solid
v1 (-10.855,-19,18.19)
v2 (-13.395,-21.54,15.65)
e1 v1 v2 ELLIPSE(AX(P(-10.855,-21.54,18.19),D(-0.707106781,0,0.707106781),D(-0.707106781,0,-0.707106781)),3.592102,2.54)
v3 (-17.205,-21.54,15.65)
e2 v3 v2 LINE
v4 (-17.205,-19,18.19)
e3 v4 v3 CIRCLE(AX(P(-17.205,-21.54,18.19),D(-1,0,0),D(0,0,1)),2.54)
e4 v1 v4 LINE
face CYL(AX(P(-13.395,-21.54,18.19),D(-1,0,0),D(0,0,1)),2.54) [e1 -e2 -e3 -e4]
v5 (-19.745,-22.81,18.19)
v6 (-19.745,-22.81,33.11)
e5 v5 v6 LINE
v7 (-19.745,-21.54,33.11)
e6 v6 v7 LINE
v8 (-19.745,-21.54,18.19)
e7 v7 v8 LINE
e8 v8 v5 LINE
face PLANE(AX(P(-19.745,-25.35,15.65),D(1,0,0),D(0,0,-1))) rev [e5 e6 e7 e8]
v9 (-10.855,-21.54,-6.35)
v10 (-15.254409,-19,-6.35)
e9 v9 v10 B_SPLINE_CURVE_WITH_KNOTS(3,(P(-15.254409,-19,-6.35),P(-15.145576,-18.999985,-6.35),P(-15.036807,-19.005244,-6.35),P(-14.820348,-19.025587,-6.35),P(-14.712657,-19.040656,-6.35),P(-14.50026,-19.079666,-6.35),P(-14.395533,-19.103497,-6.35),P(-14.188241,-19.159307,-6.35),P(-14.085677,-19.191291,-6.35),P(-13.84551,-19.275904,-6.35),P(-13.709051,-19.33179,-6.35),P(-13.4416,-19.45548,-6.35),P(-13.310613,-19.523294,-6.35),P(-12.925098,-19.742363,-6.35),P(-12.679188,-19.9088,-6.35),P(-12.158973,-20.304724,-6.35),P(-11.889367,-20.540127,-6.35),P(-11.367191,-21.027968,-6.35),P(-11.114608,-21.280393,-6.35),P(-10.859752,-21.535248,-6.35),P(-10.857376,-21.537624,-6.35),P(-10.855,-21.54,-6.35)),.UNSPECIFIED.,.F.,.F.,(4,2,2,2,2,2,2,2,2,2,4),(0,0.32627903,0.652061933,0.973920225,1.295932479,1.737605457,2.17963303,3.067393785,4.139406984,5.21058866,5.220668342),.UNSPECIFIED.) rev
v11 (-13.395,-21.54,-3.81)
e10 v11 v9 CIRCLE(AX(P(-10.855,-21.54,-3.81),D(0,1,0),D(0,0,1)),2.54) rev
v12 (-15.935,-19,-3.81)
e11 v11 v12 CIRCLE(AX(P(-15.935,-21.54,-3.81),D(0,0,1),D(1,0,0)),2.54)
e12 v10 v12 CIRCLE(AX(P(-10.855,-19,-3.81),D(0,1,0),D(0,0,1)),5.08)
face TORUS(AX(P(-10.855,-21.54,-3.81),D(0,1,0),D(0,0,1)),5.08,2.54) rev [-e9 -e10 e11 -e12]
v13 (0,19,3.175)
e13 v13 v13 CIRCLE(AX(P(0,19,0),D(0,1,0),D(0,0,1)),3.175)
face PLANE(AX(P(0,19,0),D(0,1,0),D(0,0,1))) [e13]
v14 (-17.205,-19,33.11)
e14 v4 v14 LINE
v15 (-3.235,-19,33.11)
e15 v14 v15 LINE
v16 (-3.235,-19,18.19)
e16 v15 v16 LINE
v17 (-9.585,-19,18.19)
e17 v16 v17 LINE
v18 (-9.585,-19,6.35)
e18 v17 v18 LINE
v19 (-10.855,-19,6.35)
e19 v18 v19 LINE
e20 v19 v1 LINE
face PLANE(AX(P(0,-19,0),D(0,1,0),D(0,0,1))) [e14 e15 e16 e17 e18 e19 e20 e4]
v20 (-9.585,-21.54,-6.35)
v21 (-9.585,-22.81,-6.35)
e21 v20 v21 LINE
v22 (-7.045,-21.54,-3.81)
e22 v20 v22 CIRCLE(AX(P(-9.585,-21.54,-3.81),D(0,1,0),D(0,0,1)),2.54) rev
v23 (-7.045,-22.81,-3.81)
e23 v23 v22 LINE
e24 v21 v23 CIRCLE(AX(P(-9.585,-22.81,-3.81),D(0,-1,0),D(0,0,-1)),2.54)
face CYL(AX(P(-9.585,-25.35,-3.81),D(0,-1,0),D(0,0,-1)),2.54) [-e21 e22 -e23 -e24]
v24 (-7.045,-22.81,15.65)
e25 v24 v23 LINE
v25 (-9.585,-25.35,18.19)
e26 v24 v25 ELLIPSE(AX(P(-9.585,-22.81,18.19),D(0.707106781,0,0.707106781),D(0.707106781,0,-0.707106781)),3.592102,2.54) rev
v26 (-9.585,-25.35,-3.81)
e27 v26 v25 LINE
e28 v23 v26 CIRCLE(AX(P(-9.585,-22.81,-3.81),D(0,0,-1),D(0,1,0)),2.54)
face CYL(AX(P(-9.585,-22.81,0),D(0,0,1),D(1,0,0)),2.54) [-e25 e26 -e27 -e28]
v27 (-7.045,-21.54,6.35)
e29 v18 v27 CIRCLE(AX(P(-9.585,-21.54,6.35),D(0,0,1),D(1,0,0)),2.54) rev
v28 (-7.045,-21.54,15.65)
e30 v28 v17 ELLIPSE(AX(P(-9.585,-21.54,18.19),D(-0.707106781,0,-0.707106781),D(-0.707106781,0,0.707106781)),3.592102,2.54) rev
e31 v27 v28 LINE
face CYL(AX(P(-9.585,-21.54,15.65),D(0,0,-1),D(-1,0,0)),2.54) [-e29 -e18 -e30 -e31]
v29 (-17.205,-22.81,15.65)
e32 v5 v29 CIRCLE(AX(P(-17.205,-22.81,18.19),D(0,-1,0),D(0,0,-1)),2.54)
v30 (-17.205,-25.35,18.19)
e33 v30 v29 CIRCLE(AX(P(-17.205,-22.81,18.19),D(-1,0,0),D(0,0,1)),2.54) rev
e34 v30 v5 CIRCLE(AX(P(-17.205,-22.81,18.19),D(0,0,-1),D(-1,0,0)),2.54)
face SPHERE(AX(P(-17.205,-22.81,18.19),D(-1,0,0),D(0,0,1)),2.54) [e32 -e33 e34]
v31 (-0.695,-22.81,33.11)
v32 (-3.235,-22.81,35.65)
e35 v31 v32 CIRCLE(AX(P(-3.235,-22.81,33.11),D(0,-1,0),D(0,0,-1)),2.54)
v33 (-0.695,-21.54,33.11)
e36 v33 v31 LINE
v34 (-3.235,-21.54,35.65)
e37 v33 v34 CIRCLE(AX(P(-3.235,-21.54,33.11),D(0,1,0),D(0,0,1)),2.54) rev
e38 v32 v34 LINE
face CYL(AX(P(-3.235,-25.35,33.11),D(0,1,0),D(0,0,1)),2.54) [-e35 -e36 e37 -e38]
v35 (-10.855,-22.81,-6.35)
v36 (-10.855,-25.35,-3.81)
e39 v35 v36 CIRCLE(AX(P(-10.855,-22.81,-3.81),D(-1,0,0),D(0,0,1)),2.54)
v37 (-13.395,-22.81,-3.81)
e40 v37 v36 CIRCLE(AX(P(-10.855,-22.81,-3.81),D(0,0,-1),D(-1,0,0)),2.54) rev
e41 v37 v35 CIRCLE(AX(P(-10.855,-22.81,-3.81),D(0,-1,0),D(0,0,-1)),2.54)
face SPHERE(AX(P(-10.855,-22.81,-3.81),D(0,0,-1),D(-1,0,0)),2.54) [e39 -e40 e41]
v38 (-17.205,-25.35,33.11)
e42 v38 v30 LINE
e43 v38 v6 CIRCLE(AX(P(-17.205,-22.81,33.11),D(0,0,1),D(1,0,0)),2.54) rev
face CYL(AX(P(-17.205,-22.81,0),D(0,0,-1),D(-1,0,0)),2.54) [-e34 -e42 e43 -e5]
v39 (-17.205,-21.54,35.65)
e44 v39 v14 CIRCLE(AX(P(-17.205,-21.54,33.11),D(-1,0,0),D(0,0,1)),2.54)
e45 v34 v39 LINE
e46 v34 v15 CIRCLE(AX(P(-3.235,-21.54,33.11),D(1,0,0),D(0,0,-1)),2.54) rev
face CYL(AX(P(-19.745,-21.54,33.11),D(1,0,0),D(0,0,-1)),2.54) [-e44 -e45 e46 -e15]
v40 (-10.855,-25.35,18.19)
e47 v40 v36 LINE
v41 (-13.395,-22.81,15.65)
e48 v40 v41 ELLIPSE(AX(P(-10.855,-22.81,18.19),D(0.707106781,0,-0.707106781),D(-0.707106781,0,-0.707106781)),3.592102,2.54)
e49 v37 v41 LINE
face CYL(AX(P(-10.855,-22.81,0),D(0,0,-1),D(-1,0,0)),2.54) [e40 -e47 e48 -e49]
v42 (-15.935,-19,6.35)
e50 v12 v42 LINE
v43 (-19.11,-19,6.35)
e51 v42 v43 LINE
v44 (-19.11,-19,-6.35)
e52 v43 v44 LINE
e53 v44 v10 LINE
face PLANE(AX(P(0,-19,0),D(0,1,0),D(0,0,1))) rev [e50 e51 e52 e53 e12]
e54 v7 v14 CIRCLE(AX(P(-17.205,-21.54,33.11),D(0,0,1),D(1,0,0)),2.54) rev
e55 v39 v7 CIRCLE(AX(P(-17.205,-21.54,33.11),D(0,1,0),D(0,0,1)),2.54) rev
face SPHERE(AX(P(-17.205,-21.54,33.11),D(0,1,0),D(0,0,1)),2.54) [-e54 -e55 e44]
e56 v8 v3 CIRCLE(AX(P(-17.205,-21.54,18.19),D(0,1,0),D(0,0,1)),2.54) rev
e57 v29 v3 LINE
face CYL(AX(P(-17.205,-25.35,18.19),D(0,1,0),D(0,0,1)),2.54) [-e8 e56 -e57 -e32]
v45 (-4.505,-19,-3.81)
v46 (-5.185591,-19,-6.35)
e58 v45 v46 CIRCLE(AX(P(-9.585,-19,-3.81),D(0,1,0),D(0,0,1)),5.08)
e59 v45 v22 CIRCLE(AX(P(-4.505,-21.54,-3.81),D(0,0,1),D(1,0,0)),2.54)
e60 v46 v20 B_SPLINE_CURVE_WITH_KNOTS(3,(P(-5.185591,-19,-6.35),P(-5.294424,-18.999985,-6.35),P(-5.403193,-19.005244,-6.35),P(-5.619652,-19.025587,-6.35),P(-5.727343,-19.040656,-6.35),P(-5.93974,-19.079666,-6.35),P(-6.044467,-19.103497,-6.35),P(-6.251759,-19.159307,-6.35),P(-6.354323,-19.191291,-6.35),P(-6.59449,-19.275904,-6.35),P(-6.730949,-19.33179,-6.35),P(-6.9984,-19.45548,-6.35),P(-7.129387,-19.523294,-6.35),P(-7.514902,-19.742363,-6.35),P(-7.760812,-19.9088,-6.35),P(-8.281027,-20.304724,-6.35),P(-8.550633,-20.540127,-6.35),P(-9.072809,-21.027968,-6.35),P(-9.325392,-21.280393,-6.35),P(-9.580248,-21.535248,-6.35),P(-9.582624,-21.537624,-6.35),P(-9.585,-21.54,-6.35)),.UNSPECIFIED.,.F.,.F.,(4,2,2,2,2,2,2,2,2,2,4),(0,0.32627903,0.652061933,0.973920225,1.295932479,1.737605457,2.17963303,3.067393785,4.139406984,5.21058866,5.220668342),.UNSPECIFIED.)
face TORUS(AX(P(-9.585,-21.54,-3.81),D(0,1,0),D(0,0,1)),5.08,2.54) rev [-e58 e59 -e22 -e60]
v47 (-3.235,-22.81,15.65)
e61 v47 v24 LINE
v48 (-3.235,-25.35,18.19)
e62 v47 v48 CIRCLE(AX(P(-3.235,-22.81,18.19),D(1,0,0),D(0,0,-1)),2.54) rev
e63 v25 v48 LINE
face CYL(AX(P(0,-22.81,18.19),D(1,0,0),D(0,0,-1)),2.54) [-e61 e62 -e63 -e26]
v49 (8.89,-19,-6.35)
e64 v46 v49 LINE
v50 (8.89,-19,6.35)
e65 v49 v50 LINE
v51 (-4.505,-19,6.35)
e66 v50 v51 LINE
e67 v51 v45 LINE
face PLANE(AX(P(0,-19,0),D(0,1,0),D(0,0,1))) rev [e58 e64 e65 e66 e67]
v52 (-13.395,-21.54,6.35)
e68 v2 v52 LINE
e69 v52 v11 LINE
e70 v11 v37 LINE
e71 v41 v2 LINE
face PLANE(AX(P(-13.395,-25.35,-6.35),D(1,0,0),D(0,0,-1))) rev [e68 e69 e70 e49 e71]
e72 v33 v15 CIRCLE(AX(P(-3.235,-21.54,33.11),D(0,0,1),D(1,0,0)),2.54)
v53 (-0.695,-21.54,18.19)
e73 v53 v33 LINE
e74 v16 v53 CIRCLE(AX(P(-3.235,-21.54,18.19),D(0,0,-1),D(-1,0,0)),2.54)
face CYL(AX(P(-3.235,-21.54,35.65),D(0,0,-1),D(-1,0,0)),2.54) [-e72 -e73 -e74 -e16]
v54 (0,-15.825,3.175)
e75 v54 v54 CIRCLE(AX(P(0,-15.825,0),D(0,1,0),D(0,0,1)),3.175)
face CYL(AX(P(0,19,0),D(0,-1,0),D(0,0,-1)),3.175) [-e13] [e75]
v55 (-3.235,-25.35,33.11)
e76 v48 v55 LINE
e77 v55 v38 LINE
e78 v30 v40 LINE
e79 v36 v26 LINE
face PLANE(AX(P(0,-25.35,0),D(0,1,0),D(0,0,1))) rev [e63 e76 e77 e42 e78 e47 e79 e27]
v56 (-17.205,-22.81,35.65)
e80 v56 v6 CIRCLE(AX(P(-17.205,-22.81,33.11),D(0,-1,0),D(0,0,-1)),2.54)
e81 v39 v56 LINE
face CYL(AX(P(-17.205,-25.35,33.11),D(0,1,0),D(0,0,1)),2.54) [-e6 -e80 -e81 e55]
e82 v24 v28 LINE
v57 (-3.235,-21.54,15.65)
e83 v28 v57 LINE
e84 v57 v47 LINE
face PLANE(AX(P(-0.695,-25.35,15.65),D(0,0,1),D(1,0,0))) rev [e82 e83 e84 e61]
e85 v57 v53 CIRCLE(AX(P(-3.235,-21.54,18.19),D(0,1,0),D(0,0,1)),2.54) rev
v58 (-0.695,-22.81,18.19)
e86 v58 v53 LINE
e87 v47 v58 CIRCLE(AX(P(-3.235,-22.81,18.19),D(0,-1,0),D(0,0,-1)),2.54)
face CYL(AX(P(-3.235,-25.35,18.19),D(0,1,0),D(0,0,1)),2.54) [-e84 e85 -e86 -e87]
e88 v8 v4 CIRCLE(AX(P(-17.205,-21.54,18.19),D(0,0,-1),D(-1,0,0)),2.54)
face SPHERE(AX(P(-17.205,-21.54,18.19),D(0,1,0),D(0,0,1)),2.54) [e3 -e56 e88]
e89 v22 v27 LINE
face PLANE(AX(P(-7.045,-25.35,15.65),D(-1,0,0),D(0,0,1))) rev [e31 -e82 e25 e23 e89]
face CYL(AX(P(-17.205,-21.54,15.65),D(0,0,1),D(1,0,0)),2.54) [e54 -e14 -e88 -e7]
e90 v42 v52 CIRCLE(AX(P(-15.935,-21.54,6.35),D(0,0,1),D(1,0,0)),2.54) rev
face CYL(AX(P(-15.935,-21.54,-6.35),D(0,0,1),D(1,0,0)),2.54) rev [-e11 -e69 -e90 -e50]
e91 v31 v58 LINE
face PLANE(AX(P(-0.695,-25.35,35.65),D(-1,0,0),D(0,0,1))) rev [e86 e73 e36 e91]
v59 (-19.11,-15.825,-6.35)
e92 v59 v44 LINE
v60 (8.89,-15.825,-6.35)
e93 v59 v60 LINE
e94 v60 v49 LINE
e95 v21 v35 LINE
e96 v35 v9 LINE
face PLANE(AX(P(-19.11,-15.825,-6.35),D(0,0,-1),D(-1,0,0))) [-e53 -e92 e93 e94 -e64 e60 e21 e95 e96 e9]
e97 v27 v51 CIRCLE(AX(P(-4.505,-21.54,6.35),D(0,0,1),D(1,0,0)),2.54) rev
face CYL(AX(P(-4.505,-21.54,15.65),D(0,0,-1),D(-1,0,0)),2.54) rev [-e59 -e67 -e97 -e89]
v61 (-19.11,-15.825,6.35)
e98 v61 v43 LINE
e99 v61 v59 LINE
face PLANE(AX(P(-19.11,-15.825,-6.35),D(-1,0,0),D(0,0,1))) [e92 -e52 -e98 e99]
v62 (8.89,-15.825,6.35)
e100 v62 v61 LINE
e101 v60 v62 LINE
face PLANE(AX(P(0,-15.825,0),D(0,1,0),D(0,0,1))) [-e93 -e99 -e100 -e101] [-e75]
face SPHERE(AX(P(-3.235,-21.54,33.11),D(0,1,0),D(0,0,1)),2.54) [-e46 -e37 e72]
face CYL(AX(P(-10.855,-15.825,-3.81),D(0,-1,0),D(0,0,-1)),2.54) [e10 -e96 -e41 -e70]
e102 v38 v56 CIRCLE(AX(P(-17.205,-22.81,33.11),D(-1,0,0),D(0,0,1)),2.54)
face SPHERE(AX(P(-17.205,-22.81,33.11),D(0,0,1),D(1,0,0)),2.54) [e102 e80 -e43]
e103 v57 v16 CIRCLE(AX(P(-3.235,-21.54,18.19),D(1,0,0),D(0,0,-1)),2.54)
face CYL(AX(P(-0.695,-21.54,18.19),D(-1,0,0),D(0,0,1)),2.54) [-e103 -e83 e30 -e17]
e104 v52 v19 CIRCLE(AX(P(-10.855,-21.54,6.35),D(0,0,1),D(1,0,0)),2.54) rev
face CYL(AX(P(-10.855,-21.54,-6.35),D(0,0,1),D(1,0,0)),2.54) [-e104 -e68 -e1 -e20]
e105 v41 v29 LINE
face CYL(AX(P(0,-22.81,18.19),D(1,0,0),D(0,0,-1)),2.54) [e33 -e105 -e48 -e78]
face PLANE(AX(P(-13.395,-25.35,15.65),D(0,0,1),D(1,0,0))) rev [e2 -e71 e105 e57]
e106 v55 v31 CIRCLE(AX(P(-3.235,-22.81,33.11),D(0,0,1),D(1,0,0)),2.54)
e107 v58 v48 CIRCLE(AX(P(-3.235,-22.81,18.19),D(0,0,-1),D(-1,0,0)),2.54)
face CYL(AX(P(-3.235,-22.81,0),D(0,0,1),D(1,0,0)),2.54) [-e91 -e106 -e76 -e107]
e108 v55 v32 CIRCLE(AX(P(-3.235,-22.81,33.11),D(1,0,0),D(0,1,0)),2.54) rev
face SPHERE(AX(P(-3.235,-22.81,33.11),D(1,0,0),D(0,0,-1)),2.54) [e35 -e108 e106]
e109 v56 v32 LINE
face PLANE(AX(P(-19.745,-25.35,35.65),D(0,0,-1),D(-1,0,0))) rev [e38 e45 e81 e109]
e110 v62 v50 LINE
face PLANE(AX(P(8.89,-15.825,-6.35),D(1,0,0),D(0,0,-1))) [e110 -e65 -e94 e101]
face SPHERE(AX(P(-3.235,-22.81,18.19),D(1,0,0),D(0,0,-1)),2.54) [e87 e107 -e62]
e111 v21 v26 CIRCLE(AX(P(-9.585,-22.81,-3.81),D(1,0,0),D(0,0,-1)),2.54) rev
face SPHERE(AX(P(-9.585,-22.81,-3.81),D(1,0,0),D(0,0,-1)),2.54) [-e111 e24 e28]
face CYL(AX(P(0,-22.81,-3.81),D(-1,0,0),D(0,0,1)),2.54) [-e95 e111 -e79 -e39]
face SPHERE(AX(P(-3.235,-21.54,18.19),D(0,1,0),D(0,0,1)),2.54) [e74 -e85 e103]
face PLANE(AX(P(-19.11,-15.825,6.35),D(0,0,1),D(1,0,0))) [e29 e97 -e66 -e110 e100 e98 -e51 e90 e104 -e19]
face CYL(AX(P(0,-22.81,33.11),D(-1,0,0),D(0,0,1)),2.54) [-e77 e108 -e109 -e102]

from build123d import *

# Parameters (mm, degrees)
SKETCH1_R           = 3.175
BOSS_EXTRUDE1_DEPTH = 19
SKETCH2_W           = 28
SKETCH2_H           = 12.7
BOSS_EXTRUDE2_DEPTH = 3.175
BOSS_EXTRUDE3_DEPTH = 6.35
FILLET1_R           = 2.54
FILLET2_R           = 2.54


with BuildPart() as part:
    # Sketch1 → Boss-Extrude1 (new, symmetric)
    with BuildSketch(Plane(origin=(0, 0, 0), x_dir=(1, 0, 0), z_dir=(0, 1, 0))):
        with Locations(Location((0, 0, 0), (0, 0, 270))):
            Circle(SKETCH1_R)
    extrude(amount=BOSS_EXTRUDE1_DEPTH, both=True)

    # Sketch2 → Boss-Extrude2 (add)
    with BuildSketch(Plane.XZ.offset(19)):
        with Locations((-5.11, 0)):
            Rectangle(SKETCH2_W, SKETCH2_H)
    extrude(amount=-BOSS_EXTRUDE2_DEPTH)

    # Sketch3 → Boss-Extrude3 (add)
    with BuildSketch(Plane.XZ.offset(19)):
        Polygon((-13.395, -6.35), (-13.395, 15.65), (-19.745, 15.65), (-19.745, 35.65), (-0.695, 35.65), (-0.695, 15.65), (-7.045, 15.65), (-7.045, -6.35), align=None)
    extrude(amount=BOSS_EXTRUDE3_DEPTH)

    # Fillet1
    fillet1_edges = [part.edges().sort_by_distance(p)[0] for p in [
        (-13.395, -25.35, 4.65),
        (-16.57, -25.35, 15.65),
        (-3.87, -25.35, 15.65),
        (-7.045, -25.35, 4.65),
        (-10.22, -25.35, -6.35),
        (-0.695, -22.175, 15.65),
        (-0.695, -25.35, 25.65),
        (-0.695, -19, 25.65),
        (-0.695, -22.175, 35.65),
        (-10.22, -25.35, 35.65),
        (-10.22, -19, 35.65),
        (-19.745, -22.175, 35.65),
        (-19.745, -25.35, 25.65),
        (-19.745, -22.175, 15.65),
        (-19.745, -19, 25.65),
        (-3.87, -19, 15.65),
        (-16.57, -19, 15.65),
        (-7.045, -19, 11),
        (-13.395, -19, 11),
        (-7.045, -22.175, -6.35),
        (-13.395, -22.175, -6.35),
    ]]
    fillet(fillet1_edges, radius=FILLET1_R)

    # Fillet2
    # the kernel refuses this fillet: 2.54 mm, written as the material it adds along each edge
    with BuildSketch(Plane(origin=(-9.585, -19, -3.81), x_dir=(-0.5976672776328281, 0, 0.8017442392976477), z_dir=(0.8017442392976477, 0, 0.5976672776328281))) as fillet2_piece_1_section:
        with BuildLine():
            CenterArc((2.54 + FILLET2_R, FILLET2_R), FILLET2_R, 180, 90)
            Line((2.54, FILLET2_R), (2.54, 0))
            Line((2.54, 0), (2.54 + FILLET2_R, 0))
        make_face()
    fillet2_piece_1 = revolve(axis=Axis((-9.585, -19, -3.81), (0, -1, 0)), revolution_arc=233.296989237, mode=Mode.PRIVATE)
    fillet2_piece_1 = split(fillet2_piece_1, bisect_by=Plane(origin=(-13.679769983, -19.079873008, -6.35), z_dir=(0, 0, 1)), keep=Keep.TOP, mode=Mode.PRIVATE)
    add(fillet2_piece_1)
    with BuildSketch(Plane(origin=(-10.855, -19, -3.81), x_dir=(0.5976672776328281, 0, 0.8017442392976477), z_dir=(-0.8017442392976477, 0, 0.5976672776328281))) as fillet2_piece_2_section:
        with BuildLine():
            CenterArc((2.54 + FILLET2_R, -FILLET2_R), FILLET2_R, 90, 90)
            Line((2.54, -FILLET2_R), (2.54, 0))
            Line((2.54, 0), (2.54 + FILLET2_R, 0))
        make_face()
    fillet2_piece_2 = revolve(axis=Axis((-10.855, -19, -3.81), (0, 1, 0)), revolution_arc=233.296989237, mode=Mode.PRIVATE)
    fillet2_piece_2 = split(fillet2_piece_2, bisect_by=Plane(origin=(-6.760230017, -19.079873008, -6.35), z_dir=(0, 0, 1)), keep=Keep.TOP, mode=Mode.PRIVATE)
    add(fillet2_piece_2)
    with BuildSketch(Plane(origin=(-7.045, -19, 6.35), x_dir=(1, 0, 0), z_dir=(0, 0, -1)), Plane(origin=(-13.395, -19, -3.81), x_dir=(-1, 0, 0), z_dir=(0, 0, 1))) as fillet2_piece_3:
        with BuildLine():
            CenterArc((FILLET2_R, FILLET2_R), FILLET2_R, 180, 90)
            Line((0, FILLET2_R), (0, 0))
            Line((0, 0), (FILLET2_R, 0))
        make_face()
    extrude(amount=10.16)


solid = part.part
